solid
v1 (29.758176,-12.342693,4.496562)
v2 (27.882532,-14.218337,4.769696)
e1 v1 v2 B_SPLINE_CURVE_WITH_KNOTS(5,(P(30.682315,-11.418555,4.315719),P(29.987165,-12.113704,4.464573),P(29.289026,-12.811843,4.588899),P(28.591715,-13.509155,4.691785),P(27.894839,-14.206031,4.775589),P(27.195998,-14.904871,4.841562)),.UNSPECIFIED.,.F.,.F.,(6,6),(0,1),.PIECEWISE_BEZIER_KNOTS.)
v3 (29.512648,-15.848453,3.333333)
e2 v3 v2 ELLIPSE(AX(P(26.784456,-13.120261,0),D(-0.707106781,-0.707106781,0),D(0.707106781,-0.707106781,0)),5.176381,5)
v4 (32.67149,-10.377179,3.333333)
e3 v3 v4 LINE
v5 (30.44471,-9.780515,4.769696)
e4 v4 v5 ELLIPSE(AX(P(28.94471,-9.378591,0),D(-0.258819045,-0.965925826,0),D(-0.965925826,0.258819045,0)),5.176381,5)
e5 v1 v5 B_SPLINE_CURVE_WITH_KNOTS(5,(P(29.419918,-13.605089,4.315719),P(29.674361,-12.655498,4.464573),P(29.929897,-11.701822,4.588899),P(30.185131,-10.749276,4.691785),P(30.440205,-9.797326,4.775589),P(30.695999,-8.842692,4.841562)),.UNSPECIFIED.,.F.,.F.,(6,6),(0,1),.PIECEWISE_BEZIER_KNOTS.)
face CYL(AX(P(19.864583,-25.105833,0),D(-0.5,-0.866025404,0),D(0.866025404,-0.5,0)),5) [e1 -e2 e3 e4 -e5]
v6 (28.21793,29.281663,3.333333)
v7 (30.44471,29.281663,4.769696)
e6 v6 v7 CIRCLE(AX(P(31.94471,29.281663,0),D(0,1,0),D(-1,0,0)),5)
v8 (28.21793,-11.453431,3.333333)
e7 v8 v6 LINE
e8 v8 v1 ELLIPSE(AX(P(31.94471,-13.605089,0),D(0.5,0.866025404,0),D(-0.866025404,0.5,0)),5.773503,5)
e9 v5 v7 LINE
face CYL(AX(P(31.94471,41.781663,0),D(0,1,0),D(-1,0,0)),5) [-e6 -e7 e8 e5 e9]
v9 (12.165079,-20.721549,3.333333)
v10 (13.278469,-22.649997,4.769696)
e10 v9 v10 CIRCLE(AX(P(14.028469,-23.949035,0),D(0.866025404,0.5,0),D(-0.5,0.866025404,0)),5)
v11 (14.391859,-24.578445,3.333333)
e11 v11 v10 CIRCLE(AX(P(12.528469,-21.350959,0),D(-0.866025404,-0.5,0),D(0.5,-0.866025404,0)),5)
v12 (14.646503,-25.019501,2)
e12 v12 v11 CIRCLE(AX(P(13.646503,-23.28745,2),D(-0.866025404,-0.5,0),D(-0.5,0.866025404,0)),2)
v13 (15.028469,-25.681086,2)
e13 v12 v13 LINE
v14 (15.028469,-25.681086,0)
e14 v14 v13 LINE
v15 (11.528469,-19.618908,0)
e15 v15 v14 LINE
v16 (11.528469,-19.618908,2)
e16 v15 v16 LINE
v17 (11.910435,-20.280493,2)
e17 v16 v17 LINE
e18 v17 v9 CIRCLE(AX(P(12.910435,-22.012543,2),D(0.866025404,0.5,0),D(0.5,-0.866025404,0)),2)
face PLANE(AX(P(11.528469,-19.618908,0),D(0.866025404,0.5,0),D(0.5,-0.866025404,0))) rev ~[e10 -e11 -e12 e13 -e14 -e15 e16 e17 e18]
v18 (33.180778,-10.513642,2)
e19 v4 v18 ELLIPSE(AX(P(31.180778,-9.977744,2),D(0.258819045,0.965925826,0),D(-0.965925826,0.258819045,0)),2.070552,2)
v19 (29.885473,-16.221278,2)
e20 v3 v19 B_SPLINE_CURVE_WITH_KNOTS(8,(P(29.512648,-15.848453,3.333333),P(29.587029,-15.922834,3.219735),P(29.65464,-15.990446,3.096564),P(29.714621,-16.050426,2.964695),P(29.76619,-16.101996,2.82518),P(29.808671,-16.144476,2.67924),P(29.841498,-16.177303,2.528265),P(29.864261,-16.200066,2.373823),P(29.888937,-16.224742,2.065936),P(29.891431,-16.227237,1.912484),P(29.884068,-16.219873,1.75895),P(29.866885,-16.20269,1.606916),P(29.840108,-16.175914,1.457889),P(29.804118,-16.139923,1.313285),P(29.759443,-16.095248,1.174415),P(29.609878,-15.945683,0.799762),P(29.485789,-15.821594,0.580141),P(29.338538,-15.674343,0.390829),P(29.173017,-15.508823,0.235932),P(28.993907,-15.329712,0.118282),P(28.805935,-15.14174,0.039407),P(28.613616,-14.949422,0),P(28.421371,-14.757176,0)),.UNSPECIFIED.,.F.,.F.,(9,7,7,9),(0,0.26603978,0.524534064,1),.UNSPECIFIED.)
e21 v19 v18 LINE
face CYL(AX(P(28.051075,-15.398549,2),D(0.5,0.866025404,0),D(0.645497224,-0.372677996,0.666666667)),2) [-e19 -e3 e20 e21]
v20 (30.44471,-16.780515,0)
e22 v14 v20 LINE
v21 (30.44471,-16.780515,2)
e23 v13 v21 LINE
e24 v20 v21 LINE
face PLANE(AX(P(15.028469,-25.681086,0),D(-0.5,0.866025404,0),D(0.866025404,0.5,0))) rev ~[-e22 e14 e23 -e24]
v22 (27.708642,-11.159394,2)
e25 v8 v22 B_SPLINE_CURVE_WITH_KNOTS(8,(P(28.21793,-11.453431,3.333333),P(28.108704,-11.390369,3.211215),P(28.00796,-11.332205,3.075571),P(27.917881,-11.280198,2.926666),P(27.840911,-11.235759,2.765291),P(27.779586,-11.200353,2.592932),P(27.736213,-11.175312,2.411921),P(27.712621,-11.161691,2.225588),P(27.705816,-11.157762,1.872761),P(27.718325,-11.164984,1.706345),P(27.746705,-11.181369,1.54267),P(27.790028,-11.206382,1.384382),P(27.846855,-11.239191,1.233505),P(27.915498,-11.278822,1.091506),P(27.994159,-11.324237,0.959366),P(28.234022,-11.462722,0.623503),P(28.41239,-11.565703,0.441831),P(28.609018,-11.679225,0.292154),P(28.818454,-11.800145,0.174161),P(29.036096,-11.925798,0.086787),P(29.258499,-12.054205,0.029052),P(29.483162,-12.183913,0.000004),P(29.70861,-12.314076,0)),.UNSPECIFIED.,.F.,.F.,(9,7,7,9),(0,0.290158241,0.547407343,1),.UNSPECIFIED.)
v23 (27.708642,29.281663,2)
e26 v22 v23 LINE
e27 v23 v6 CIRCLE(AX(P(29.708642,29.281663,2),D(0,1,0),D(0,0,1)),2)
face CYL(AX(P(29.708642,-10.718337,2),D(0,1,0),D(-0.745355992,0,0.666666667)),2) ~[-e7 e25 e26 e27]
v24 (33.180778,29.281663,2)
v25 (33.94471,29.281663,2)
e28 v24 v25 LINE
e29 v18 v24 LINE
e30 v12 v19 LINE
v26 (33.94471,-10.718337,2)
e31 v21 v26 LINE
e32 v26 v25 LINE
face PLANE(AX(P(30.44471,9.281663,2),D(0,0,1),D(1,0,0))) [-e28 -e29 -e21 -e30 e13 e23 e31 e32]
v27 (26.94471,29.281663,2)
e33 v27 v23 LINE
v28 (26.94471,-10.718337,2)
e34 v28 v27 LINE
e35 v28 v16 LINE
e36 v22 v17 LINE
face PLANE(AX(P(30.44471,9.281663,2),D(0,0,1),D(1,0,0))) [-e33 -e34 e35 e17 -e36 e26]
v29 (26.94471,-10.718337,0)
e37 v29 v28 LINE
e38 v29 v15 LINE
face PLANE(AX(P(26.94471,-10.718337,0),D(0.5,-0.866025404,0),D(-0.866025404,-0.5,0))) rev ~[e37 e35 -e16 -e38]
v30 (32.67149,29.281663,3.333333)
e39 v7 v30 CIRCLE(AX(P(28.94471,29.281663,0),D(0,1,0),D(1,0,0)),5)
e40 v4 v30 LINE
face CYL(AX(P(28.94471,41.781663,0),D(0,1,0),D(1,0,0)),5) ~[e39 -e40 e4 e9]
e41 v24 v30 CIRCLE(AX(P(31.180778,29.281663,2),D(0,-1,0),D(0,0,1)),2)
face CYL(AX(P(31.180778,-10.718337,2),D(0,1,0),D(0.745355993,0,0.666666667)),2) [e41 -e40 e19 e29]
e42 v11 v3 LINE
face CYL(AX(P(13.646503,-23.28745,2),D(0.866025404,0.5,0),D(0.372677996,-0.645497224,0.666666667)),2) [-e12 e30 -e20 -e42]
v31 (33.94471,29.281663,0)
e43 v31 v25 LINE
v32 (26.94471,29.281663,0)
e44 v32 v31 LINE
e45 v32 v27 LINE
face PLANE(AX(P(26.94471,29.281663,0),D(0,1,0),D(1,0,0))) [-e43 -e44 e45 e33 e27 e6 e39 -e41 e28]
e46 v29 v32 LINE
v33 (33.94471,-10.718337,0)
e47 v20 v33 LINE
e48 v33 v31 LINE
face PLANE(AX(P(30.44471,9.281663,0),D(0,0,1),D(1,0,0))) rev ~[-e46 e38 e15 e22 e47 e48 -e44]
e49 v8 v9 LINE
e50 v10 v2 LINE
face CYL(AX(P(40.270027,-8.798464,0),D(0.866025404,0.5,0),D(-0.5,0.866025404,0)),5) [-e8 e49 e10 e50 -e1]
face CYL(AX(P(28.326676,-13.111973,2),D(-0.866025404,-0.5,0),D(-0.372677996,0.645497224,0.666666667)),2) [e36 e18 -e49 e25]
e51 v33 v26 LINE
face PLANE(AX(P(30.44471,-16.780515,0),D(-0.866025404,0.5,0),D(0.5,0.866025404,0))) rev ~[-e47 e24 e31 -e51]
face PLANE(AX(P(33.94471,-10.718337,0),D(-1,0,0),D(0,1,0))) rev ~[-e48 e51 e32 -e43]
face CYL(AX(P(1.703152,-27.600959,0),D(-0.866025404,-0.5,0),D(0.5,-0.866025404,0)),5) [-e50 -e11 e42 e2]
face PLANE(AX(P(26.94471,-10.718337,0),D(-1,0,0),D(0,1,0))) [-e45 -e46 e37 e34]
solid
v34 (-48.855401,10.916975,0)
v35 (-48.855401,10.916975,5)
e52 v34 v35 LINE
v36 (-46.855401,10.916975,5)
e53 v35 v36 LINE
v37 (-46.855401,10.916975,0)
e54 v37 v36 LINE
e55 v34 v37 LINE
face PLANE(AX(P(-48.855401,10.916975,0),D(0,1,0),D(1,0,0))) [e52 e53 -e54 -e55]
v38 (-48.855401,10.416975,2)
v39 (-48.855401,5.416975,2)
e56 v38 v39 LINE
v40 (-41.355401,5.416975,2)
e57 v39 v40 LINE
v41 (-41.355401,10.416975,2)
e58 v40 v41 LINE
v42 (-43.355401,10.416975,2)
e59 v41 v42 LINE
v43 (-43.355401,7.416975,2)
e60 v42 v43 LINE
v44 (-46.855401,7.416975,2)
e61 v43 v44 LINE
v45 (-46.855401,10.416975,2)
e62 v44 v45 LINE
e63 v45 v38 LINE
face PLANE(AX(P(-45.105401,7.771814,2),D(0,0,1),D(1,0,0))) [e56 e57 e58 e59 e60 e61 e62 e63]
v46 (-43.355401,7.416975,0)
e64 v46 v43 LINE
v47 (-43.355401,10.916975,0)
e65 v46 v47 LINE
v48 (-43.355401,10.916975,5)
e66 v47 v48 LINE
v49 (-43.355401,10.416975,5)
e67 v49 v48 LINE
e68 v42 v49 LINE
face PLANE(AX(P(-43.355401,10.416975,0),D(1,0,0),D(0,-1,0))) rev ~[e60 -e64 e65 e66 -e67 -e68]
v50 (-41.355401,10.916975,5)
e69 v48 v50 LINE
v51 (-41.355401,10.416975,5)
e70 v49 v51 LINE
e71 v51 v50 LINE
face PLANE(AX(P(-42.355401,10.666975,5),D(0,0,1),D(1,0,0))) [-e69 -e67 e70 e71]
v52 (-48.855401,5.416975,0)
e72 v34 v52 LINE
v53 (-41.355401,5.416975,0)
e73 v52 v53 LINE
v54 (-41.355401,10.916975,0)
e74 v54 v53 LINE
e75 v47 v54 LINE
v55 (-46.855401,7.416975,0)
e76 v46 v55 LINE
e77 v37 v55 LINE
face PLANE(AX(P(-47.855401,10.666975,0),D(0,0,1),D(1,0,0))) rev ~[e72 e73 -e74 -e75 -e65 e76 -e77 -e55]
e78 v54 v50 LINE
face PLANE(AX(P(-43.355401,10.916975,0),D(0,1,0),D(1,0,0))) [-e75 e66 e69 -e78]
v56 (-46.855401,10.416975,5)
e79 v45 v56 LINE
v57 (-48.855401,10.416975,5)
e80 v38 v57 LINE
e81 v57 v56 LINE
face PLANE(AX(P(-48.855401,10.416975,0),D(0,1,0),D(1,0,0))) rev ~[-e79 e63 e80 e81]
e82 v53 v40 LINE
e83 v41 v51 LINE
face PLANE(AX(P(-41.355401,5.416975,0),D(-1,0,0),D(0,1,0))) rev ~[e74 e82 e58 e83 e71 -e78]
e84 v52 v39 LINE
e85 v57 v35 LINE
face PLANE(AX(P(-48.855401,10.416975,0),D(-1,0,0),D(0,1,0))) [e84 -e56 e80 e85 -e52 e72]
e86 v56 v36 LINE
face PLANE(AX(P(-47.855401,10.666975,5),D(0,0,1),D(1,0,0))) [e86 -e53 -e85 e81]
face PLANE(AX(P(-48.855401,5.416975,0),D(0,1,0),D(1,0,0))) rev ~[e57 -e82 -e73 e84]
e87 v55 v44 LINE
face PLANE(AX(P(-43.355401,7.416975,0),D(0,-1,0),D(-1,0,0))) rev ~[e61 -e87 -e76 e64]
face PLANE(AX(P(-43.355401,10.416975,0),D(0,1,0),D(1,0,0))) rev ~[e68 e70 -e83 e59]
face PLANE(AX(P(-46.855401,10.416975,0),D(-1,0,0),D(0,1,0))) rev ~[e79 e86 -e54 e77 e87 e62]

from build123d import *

# Parameters (mm, degrees)
F0_W         = 7
F0_H         = 40
F1_DEPTH     = 5
F2_T1_DEPTH  = 32
F2_T3_DEPTH  = 42.8011414996
F2_T5_DEPTH  = 65
F2_T10_DEPTH = 65
F2_T15_DEPTH = 42.8011414996
F2_T21_DEPTH = 65
F2_T25_DEPTH = 42.8011414996
F3_R         = 2
F4_DEPTH     = 2
F0_W_2       = 2
F0_H_2       = 0.5
F5_DEPTH     = 5


# Not quite as in the source:
# - a fillet or chamfer that OpenCascade refuses, or shapes differently, is made with other operations: its cross-section is extruded or revolved along the edge and cut away or added


with BuildPart() as f1:
    # F0 (on Top) → F1 (new body)
    with BuildSketch(Plane.XY):
        Polygon((30.4447099417, -16.7805150867), (26.9447099417, -10.7183372602), (11.5284691868, -19.61890801), (15.0284691868, -25.6810858365), align=None)
        Polygon((33.9447099417, -10.7183372602), (26.9447099417, -10.7183372602), (30.4447099417, -16.7805150867), align=None)
        with Locations((30.4447099417, 9.2816627398)):
            Rectangle(F0_W, F0_H)
    extrude(amount=F1_DEPTH)

    # F2: fillet of radius 5 on 5 edges, made by hand

    # F2_s2 → F2_t1 (cut)
    with BuildSketch(Plane(origin=(-5.9049986914, -10.2277577521, 0), x_dir=(0, 0, 1), z_dir=(0.5, 0.8660254038, 0))):
        with BuildLine():
            ThreePointArc((0, 34.7561497637), (3.5355339059, 33.2916836697), (5, 29.7561497637))
            Line((5, 29.7561497637), (5, 34.7561497637))
            Line((5, 34.7561497637), (0, 34.7561497637))
        make_face()
    extrude(amount=F2_T1_DEPTH, mode=Mode.SUBTRACT)

    # F2_s4 → F2_t3 (cut)
    with BuildSketch(Plane(origin=(-10.6742020228, -6.1627534112, 0), x_dir=(0, 0, 1), z_dir=(0.8660254038, 0.5, 0))):
        with BuildLine():
            ThreePointArc((0, 29.7547073245), (3.5355339059, 28.2902412305), (5, 24.7547073245))
            Line((5, 24.7547073245), (5, 29.7547073245))
            Line((5, 29.7547073245), (0, 29.7547073245))
        make_face()
    extrude(amount=F2_T3_DEPTH, mode=Mode.SUBTRACT)

    # F2_s6 → F2_t5 (cut)
    with BuildSketch(Plane.XZ.offset(-41.7816627398)):
        with BuildLine():
            ThreePointArc((33.9447099417, 0), (32.4802438477, 3.5355339059), (28.9447099417, 5))
            Line((28.9447099417, 5), (33.9447099417, 5))
            Line((33.9447099417, 5), (33.9447099417, 0))
        make_face()
    extrude(amount=F2_T5_DEPTH, mode=Mode.SUBTRACT)


with BuildPart() as f2_tool8:
    # F2_s9 → F2_t10 (new body)
    with BuildSketch(Plane.XZ.offset(-41.7816627398)):
        with BuildLine():
            ThreePointArc((26.9447099417, 0), (28.4091760358, 3.5355339059), (31.9447099417, 5))
            Line((31.9447099417, 5), (26.9447099417, 5))
            Line((26.9447099417, 5), (26.9447099417, 0))
        make_face()
    extrude(amount=F2_T10_DEPTH)

    split(bisect_by=Plane(origin=(11.3773536623, -19.7061545987, 0), x_dir=(0, 0, 1), z_dir=(-0.5, 0.8660254038, 0)), keep=Keep.TOP)


with BuildPart() as f1_1:
    add(f1.part)

    # F2_t7: cut F2_tool8
    add(f2_tool8.part, mode=Mode.SUBTRACT)


with BuildPart() as f2_tool13:
    # F2_s14 → F2_t15 (new body)
    with BuildSketch(Plane(origin=(26.3926738268, 15.2378173385, 0), x_dir=(0, 0, 1), z_dir=(-0.8660254038, -0.5, 0))):
        with BuildLine():
            ThreePointArc((0, -22.7547073245), (3.5355339059, -24.2191734186), (5, -27.7547073245))
            Line((5, -27.7547073245), (5, -22.7547073245))
            Line((5, -22.7547073245), (0, -22.7547073245))
        make_face()
    extrude(amount=F2_T15_DEPTH)

    split(bisect_by=Plane.YZ.offset(26.9447099417), keep=Keep.BOTTOM)


with BuildPart() as f1_2:
    add(f1_1.part)

    # F2_t12: cut F2_tool13
    add(f2_tool13.part, mode=Mode.SUBTRACT)


with BuildPart() as f2_tool19:
    # F2_s20 → F2_t21 (new body)
    with BuildSketch(Plane.XZ.offset(-41.7816627398)):
        with BuildLine():
            ThreePointArc((26.9447099417, 0), (28.4091760358, 3.5355339059), (31.9447099417, 5))
            Line((31.9447099417, 5), (26.9447099417, 5))
            Line((26.9447099417, 5), (26.9447099417, 0))
        make_face()
    extrude(amount=F2_T21_DEPTH)

    split(bisect_by=Plane(origin=(11.3773536623, -19.7061545987, 0), x_dir=(0, 0, 1), z_dir=(0.5, -0.8660254038, 0)), keep=Keep.TOP)


with BuildPart() as f2_tool23:
    # F2_s24 → F2_t25 (new body)
    with BuildSketch(Plane(origin=(26.3926738268, 15.2378173385, 0), x_dir=(0, 0, 1), z_dir=(-0.8660254038, -0.5, 0))):
        with BuildLine():
            ThreePointArc((0, -22.7547073245), (3.5355339059, -24.2191734186), (5, -27.7547073245))
            Line((5, -27.7547073245), (5, -22.7547073245))
            Line((5, -22.7547073245), (0, -22.7547073245))
        make_face()
    extrude(amount=F2_T25_DEPTH)

    split(bisect_by=Plane.YZ.offset(26.9447099417), keep=Keep.TOP)


with BuildPart() as f2_tool19_1:
    add(f2_tool19.part)

    # F2_t27: intersect F2_tool23
    add(f2_tool23.part, mode=Mode.INTERSECT)


with BuildPart() as f1_3:
    add(f1_2.part)

    # F2_t17: cut F2_tool19
    add(f2_tool19_1.part, mode=Mode.SUBTRACT)

    # F3
    f3_edges = [f1_3.edges().sort_by_distance(p)[0] for p in [
        (13.278469, -22.649997, 0),
        (22.73659, -21.2308, 0),
        (19.23659, -15.168623, 0),
        (26.94471, 9.281663, 0),
        (33.94471, 9.281663, 0),
        (32.19471, -13.749426, 0),
        (30.44471, 29.281663, 0),
    ]]
    fillet(f3_edges, radius=F3_R)

    # F0 (on Top) → F4 (join)
    with BuildSketch(Plane.XY):
        with Locations((30.4447099417, 9.2816627398)):
            Rectangle(F0_W, F0_H)
        Polygon((30.4447099417, -16.7805150867), (26.9447099417, -10.7183372602), (11.5284691868, -19.61890801), (15.0284691868, -25.6810858365), align=None)
        Polygon((33.9447099417, -10.7183372602), (26.9447099417, -10.7183372602), (30.4447099417, -16.7805150867), align=None)
    extrude(amount=F4_DEPTH)


with BuildPart() as f4:
    # F0 (on Top) → F4, piece 2 (new body)
    with BuildSketch(Plane.XY):
        Polygon((-46.8554012775, 10.416974891), (-48.8554012775, 10.416974891), (-48.8554012775, 5.416974891), (-41.3554012775, 5.416974891), (-41.3554012775, 10.416974891), (-43.3554012775, 10.416974891), (-43.3554012775, 7.416974891), (-46.8554012775, 7.416974891), align=None)
    extrude(amount=F4_DEPTH)

    # F0 (on Top) → F5 (join)
    with BuildSketch(Plane.XY):
        with Locations((-47.8554012775, 10.666974891)):
            Rectangle(F0_W_2, F0_H_2)
        with Locations((-42.3554012775, 10.666974891)):
            Rectangle(F0_W_2, F0_H_2)
    extrude(amount=F5_DEPTH)


solid = Compound([f1_3.part, f4.part])
